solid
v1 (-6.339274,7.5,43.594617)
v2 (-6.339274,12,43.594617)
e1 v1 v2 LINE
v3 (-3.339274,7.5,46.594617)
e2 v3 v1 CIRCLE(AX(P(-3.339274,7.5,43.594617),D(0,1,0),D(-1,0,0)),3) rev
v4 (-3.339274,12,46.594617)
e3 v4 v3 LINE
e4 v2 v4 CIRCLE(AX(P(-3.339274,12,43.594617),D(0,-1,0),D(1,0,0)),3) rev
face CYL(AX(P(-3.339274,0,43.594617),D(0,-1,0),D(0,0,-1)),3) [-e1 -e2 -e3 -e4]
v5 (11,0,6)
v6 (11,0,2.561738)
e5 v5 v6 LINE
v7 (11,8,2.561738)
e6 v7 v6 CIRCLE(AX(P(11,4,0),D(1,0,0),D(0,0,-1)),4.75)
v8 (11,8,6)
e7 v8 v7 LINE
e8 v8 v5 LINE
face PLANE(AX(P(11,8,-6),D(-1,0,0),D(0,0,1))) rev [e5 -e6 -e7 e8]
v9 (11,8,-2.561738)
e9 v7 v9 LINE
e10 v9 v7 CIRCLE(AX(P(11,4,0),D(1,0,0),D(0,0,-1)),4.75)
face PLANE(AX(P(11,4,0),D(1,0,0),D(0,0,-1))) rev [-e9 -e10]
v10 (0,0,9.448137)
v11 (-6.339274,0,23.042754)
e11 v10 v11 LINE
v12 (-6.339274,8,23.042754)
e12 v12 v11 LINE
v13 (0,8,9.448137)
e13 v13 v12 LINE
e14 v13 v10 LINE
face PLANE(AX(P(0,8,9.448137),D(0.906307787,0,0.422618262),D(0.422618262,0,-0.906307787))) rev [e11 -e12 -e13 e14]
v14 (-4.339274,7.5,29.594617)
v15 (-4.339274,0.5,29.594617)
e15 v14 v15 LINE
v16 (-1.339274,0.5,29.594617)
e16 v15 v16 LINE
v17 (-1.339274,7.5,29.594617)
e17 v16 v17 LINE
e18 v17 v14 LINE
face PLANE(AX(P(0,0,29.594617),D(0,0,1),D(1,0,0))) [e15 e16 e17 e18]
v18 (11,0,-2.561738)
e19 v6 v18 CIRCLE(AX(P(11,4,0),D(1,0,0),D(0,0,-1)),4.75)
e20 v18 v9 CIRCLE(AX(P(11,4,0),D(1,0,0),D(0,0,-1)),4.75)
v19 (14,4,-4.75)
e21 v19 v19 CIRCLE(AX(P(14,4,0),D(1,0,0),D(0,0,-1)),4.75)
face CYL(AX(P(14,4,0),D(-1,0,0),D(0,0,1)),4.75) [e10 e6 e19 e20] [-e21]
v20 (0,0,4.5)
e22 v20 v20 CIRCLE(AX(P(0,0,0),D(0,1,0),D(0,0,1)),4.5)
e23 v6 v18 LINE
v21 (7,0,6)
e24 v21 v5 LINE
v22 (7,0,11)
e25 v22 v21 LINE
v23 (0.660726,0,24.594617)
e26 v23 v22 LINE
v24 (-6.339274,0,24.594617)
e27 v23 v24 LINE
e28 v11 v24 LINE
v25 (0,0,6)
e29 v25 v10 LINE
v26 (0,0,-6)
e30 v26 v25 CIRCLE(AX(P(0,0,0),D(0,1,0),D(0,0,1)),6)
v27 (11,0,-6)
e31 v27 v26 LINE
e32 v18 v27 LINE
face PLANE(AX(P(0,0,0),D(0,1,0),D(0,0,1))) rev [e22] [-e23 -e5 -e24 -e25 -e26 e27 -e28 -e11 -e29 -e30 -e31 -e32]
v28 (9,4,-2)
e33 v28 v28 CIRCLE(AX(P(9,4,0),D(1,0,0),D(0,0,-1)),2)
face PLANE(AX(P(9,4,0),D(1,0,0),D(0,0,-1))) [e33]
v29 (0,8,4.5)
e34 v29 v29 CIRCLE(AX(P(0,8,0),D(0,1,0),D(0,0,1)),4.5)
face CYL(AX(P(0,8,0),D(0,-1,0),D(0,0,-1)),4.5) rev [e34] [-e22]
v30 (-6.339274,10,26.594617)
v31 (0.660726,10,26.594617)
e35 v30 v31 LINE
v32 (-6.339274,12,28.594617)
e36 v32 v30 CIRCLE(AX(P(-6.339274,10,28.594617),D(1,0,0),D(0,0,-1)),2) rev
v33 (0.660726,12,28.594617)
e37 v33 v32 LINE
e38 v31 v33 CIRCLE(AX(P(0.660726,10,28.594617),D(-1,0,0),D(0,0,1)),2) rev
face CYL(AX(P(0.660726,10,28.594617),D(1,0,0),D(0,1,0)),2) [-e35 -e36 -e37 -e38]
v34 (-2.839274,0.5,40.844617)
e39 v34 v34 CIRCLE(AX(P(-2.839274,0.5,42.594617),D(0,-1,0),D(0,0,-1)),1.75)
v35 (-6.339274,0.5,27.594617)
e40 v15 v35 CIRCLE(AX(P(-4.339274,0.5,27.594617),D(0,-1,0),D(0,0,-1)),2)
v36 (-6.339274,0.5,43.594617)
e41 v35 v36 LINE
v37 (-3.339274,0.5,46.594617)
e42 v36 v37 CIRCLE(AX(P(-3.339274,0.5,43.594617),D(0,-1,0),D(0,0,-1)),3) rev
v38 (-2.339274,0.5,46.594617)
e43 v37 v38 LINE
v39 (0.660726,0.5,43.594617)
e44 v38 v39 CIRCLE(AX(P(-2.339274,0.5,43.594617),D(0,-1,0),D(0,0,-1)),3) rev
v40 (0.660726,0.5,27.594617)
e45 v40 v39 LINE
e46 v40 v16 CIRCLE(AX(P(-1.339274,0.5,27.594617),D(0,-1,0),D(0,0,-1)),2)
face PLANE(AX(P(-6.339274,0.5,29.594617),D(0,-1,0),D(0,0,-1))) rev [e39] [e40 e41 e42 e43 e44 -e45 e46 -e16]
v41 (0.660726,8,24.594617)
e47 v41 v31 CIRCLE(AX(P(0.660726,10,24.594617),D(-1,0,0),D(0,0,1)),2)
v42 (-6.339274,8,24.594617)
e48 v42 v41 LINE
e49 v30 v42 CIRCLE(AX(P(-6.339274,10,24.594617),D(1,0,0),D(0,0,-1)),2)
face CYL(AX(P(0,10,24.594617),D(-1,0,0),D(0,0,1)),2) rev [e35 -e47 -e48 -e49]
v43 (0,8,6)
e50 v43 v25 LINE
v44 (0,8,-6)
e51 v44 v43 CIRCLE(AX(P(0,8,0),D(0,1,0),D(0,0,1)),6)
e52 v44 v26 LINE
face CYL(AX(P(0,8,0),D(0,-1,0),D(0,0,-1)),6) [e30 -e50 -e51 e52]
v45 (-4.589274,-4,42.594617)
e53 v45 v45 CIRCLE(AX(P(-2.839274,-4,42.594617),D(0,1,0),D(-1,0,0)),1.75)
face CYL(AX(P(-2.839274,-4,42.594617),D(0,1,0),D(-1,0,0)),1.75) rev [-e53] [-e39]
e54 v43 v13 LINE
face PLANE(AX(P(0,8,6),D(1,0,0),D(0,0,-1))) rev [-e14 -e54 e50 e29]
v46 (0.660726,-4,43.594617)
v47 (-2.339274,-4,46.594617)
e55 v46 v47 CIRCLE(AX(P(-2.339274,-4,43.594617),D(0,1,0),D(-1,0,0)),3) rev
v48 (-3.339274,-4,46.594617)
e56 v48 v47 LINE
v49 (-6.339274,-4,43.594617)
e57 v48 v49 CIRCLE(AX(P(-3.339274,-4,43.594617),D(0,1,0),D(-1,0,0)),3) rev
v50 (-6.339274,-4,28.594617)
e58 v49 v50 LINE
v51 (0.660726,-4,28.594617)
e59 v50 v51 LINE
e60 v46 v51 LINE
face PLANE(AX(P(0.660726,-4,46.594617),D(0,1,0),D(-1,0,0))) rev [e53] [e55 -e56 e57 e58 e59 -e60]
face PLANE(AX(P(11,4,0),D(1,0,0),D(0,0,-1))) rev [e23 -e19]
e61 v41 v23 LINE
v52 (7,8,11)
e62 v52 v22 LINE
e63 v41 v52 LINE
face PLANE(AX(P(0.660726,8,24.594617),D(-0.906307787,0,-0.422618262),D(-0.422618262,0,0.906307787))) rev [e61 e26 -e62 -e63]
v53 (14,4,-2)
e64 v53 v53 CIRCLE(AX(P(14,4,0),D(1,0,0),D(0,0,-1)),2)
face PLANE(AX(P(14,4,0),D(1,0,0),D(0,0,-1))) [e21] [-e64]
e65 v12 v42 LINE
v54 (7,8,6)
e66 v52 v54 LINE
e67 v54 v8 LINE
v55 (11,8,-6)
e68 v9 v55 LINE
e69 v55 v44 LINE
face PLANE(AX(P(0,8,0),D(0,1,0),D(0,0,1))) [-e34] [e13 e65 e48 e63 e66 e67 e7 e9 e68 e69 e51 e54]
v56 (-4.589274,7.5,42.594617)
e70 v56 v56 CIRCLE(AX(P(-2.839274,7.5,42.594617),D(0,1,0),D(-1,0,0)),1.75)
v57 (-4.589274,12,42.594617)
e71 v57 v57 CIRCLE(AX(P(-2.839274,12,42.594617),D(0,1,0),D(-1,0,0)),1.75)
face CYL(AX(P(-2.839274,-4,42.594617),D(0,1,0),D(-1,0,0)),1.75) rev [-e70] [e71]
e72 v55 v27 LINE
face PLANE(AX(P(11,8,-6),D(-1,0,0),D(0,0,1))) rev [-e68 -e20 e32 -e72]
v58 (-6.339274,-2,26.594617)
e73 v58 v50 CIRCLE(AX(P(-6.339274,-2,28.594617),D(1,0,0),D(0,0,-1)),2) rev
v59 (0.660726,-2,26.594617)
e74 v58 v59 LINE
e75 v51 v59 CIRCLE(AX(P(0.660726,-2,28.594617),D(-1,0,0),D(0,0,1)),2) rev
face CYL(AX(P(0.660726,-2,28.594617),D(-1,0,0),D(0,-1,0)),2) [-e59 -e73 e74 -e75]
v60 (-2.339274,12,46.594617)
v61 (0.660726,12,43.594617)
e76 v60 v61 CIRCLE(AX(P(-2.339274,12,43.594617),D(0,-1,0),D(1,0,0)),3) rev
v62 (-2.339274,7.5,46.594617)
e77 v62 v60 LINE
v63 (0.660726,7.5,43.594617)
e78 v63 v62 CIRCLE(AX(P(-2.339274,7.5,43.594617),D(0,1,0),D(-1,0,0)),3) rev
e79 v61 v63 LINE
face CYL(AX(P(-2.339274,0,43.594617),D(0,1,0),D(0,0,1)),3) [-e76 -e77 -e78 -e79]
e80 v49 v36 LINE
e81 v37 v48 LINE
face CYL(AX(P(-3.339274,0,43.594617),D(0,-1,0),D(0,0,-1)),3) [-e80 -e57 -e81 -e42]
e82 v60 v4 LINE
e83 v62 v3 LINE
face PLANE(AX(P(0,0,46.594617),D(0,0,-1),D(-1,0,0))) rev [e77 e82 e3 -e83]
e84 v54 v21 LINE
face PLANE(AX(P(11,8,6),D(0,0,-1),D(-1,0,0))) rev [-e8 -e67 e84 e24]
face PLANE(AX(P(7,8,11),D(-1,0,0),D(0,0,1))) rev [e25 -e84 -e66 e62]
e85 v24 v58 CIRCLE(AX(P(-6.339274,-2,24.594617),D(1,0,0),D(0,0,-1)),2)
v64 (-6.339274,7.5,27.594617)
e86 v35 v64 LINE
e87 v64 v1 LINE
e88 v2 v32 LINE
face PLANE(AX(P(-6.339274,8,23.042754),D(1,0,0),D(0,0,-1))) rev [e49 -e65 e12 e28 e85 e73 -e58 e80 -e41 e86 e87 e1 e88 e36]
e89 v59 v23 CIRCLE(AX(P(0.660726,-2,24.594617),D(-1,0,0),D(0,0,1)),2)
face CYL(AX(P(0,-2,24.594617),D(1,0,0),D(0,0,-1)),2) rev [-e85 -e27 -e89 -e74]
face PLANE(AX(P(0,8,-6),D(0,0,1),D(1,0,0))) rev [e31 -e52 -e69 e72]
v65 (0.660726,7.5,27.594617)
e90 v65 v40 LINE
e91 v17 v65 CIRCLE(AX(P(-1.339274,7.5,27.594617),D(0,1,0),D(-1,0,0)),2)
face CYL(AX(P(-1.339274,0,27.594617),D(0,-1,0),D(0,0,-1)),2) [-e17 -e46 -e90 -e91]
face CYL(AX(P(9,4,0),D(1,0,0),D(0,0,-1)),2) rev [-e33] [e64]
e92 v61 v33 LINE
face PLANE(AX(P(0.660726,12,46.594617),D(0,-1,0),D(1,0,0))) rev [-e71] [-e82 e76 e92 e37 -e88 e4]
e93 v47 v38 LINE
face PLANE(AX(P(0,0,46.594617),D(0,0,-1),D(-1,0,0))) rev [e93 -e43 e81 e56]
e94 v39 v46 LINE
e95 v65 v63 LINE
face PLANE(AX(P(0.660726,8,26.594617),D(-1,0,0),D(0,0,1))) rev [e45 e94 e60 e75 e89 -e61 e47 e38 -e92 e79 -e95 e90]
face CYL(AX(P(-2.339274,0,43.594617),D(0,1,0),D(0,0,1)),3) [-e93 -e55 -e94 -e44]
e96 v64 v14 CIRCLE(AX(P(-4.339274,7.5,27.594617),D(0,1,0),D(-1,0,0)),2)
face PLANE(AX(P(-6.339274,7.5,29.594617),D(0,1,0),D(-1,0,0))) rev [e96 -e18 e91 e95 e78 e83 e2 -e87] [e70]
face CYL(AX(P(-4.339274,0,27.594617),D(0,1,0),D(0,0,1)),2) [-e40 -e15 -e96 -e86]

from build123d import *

# Parameters (mm, degrees)
SKETCH1_R           = 4.5
BOSS_EXTRUDE1_DEPTH = 8
SKETCH2_R           = 4.75
BOSS_EXTRUDE2_DEPTH = 3
SKETCH3_R           = 2
CUT_EXTRUDE1_DEPTH  = 5
BOSS_EXTRUDE3_DEPTH = 8
SKETCH5_W           = 7
SKETCH5_H           = 16
BOSS_EXTRUDE4_DEPTH = 20
FILLET1_START       = -7
FILLET1_DEPTH       = 18
FILLET1_START_2     = -6.339273926
FILLET1_2_DEPTH     = 7
SKETCH6_W           = 7
SKETCH6_H           = 7
CUT_EXTRUDE2_DEPTH  = 17
FILLET2_R           = 3
SKETCH7_R           = 1.75
CUT_EXTRUDE3_DEPTH  = 52.215801422
FILLET3_R           = 2


with BuildPart() as part:
    # Sketch1 → Boss-Extrude1 (new body)
    with BuildSketch(Plane(origin=(0, 0, 0), x_dir=(1, 0, 0), z_dir=(0, 1, 0))):
        with BuildLine():
            Line((0, 6), (11, 6))
            Line((11, 6), (11, -6))
            Line((11, -6), (0, -6))
            ThreePointArc((0, -6), (-6, 0), (0, 6))
        make_face()
        with Locations(Location((0, 0, 0), (0, 0, 270))):
            Circle(SKETCH1_R, mode=Mode.SUBTRACT)
    extrude(amount=BOSS_EXTRUDE1_DEPTH)

    # Sketch2 → Boss-Extrude2 (add)
    with BuildSketch(Plane(origin=(11, 0, 0), x_dir=(0, 0, -1), z_dir=(1, 0, 0))):
        with Locations(Location((0, 4, 0), (0, 0, 122.636897504))):
            Circle(SKETCH2_R)
    extrude(amount=BOSS_EXTRUDE2_DEPTH)

    # Sketch3 → Cut-Extrude1 (cut)
    with BuildSketch(Plane(origin=(14, 0, 0), x_dir=(0, 0, -1), z_dir=(1, 0, 0))):
        with Locations((0, 4)):
            Circle(SKETCH3_R)
    extrude(amount=-CUT_EXTRUDE1_DEPTH, mode=Mode.SUBTRACT)

    # Sketch4 → Boss-Extrude3 (add)
    with BuildSketch(Plane(origin=(0, 0, 0), x_dir=(1, 0, 0), z_dir=(0, 1, 0))):
        Polygon((0, -6), (0, -9.448137361), (-6.339273926, -23.042754167), (-6.339273926, -26.594616806), (0.660726074, -26.594616806), (0.660726074, -24.594616806), (7, -11), (7, -6), align=None)
    extrude(amount=BOSS_EXTRUDE3_DEPTH)

    # Sketch5 → Boss-Extrude4 (add)
    with BuildSketch(Plane.XY.offset(26.594616806)):
        with Locations((-2.839273926, 4)):
            Rectangle(SKETCH5_W, SKETCH5_H)
    extrude(amount=BOSS_EXTRUDE4_DEPTH)

    # Fillet1: read off the stored shape, not the designer's step
    # Fillet1 outline → Fillet1 (cut)
    with BuildSketch(Plane.YZ.offset(FILLET1_START)):
        with BuildLine():
            Line((-4, 26.594616806), (-2, 26.594616806))
            ThreePointArc((-2, 26.594616806), (-3.414213563, 27.180403244), (-4, 28.594616806))
            Line((-4, 28.594616806), (-4, 26.594616806))
        make_face()
        with BuildLine():
            ThreePointArc((12, 28.594616806), (11.414213563, 27.180403244), (10, 26.594616806))
            Line((10, 26.594616806), (12, 26.594616806))
            Line((12, 26.594616806), (12, 28.594616806))
        make_face()
    extrude(amount=FILLET1_DEPTH, mode=Mode.SUBTRACT)

    # Fillet1 2 outline → Fillet1 2 (add)
    with BuildSketch(Plane.YZ.offset(FILLET1_START_2)):
        with BuildLine():
            ThreePointArc((-2, 26.594616806), (-0.585786438, 26.008830368), (0, 24.594616806))
            Line((0, 24.594616806), (0, 26.594616806))
            Line((0, 26.594616806), (-2, 26.594616806))
        make_face()
        with BuildLine():
            ThreePointArc((8, 24.594616806), (8.585786438, 26.008830368), (10, 26.594616806))
            Line((10, 26.594616806), (8, 26.594616806))
            Line((8, 26.594616806), (8, 24.594616806))
        make_face()
    extrude(amount=FILLET1_2_DEPTH)

    # Sketch6 → Cut-Extrude2 (cut)
    with BuildSketch(Plane.XY.offset(46.594616806)):
        with Locations((-2.839273926, 4)):
            Rectangle(SKETCH6_W, SKETCH6_H)
    extrude(amount=-CUT_EXTRUDE2_DEPTH, mode=Mode.SUBTRACT)

    # Fillet2
    fillet2_edges = [part.edges().sort_by_distance(p)[0] for p in [
        (0.660726074, -1.75, 46.594616806),
        (-6.339273926, 9.75, 46.594616806),
        (0.660726074, 9.75, 46.594616806),
        (-6.339273926, -1.75, 46.594616806),
    ]]
    fillet(fillet2_edges, radius=FILLET2_R)

    # Sketch7 → Cut-Extrude3 (cut, through all)
    with BuildSketch(Plane(origin=(0, 12, 0), x_dir=(1, 0, 0), z_dir=(0, 1, 0))):
        with Locations(Location((-2.839273926, -42.594616806, 0), (0, 0, 180))):
            Circle(SKETCH7_R)
    extrude(amount=-CUT_EXTRUDE3_DEPTH, mode=Mode.SUBTRACT)

    # Fillet3
    fillet3_edges = [part.edges().sort_by_distance(p)[0] for p in [
        (-6.339273926, 4, 29.594616806),
        (0.660726074, 4, 29.594616806),
    ]]
    fillet(fillet3_edges, radius=FILLET3_R)


solid = part.part
